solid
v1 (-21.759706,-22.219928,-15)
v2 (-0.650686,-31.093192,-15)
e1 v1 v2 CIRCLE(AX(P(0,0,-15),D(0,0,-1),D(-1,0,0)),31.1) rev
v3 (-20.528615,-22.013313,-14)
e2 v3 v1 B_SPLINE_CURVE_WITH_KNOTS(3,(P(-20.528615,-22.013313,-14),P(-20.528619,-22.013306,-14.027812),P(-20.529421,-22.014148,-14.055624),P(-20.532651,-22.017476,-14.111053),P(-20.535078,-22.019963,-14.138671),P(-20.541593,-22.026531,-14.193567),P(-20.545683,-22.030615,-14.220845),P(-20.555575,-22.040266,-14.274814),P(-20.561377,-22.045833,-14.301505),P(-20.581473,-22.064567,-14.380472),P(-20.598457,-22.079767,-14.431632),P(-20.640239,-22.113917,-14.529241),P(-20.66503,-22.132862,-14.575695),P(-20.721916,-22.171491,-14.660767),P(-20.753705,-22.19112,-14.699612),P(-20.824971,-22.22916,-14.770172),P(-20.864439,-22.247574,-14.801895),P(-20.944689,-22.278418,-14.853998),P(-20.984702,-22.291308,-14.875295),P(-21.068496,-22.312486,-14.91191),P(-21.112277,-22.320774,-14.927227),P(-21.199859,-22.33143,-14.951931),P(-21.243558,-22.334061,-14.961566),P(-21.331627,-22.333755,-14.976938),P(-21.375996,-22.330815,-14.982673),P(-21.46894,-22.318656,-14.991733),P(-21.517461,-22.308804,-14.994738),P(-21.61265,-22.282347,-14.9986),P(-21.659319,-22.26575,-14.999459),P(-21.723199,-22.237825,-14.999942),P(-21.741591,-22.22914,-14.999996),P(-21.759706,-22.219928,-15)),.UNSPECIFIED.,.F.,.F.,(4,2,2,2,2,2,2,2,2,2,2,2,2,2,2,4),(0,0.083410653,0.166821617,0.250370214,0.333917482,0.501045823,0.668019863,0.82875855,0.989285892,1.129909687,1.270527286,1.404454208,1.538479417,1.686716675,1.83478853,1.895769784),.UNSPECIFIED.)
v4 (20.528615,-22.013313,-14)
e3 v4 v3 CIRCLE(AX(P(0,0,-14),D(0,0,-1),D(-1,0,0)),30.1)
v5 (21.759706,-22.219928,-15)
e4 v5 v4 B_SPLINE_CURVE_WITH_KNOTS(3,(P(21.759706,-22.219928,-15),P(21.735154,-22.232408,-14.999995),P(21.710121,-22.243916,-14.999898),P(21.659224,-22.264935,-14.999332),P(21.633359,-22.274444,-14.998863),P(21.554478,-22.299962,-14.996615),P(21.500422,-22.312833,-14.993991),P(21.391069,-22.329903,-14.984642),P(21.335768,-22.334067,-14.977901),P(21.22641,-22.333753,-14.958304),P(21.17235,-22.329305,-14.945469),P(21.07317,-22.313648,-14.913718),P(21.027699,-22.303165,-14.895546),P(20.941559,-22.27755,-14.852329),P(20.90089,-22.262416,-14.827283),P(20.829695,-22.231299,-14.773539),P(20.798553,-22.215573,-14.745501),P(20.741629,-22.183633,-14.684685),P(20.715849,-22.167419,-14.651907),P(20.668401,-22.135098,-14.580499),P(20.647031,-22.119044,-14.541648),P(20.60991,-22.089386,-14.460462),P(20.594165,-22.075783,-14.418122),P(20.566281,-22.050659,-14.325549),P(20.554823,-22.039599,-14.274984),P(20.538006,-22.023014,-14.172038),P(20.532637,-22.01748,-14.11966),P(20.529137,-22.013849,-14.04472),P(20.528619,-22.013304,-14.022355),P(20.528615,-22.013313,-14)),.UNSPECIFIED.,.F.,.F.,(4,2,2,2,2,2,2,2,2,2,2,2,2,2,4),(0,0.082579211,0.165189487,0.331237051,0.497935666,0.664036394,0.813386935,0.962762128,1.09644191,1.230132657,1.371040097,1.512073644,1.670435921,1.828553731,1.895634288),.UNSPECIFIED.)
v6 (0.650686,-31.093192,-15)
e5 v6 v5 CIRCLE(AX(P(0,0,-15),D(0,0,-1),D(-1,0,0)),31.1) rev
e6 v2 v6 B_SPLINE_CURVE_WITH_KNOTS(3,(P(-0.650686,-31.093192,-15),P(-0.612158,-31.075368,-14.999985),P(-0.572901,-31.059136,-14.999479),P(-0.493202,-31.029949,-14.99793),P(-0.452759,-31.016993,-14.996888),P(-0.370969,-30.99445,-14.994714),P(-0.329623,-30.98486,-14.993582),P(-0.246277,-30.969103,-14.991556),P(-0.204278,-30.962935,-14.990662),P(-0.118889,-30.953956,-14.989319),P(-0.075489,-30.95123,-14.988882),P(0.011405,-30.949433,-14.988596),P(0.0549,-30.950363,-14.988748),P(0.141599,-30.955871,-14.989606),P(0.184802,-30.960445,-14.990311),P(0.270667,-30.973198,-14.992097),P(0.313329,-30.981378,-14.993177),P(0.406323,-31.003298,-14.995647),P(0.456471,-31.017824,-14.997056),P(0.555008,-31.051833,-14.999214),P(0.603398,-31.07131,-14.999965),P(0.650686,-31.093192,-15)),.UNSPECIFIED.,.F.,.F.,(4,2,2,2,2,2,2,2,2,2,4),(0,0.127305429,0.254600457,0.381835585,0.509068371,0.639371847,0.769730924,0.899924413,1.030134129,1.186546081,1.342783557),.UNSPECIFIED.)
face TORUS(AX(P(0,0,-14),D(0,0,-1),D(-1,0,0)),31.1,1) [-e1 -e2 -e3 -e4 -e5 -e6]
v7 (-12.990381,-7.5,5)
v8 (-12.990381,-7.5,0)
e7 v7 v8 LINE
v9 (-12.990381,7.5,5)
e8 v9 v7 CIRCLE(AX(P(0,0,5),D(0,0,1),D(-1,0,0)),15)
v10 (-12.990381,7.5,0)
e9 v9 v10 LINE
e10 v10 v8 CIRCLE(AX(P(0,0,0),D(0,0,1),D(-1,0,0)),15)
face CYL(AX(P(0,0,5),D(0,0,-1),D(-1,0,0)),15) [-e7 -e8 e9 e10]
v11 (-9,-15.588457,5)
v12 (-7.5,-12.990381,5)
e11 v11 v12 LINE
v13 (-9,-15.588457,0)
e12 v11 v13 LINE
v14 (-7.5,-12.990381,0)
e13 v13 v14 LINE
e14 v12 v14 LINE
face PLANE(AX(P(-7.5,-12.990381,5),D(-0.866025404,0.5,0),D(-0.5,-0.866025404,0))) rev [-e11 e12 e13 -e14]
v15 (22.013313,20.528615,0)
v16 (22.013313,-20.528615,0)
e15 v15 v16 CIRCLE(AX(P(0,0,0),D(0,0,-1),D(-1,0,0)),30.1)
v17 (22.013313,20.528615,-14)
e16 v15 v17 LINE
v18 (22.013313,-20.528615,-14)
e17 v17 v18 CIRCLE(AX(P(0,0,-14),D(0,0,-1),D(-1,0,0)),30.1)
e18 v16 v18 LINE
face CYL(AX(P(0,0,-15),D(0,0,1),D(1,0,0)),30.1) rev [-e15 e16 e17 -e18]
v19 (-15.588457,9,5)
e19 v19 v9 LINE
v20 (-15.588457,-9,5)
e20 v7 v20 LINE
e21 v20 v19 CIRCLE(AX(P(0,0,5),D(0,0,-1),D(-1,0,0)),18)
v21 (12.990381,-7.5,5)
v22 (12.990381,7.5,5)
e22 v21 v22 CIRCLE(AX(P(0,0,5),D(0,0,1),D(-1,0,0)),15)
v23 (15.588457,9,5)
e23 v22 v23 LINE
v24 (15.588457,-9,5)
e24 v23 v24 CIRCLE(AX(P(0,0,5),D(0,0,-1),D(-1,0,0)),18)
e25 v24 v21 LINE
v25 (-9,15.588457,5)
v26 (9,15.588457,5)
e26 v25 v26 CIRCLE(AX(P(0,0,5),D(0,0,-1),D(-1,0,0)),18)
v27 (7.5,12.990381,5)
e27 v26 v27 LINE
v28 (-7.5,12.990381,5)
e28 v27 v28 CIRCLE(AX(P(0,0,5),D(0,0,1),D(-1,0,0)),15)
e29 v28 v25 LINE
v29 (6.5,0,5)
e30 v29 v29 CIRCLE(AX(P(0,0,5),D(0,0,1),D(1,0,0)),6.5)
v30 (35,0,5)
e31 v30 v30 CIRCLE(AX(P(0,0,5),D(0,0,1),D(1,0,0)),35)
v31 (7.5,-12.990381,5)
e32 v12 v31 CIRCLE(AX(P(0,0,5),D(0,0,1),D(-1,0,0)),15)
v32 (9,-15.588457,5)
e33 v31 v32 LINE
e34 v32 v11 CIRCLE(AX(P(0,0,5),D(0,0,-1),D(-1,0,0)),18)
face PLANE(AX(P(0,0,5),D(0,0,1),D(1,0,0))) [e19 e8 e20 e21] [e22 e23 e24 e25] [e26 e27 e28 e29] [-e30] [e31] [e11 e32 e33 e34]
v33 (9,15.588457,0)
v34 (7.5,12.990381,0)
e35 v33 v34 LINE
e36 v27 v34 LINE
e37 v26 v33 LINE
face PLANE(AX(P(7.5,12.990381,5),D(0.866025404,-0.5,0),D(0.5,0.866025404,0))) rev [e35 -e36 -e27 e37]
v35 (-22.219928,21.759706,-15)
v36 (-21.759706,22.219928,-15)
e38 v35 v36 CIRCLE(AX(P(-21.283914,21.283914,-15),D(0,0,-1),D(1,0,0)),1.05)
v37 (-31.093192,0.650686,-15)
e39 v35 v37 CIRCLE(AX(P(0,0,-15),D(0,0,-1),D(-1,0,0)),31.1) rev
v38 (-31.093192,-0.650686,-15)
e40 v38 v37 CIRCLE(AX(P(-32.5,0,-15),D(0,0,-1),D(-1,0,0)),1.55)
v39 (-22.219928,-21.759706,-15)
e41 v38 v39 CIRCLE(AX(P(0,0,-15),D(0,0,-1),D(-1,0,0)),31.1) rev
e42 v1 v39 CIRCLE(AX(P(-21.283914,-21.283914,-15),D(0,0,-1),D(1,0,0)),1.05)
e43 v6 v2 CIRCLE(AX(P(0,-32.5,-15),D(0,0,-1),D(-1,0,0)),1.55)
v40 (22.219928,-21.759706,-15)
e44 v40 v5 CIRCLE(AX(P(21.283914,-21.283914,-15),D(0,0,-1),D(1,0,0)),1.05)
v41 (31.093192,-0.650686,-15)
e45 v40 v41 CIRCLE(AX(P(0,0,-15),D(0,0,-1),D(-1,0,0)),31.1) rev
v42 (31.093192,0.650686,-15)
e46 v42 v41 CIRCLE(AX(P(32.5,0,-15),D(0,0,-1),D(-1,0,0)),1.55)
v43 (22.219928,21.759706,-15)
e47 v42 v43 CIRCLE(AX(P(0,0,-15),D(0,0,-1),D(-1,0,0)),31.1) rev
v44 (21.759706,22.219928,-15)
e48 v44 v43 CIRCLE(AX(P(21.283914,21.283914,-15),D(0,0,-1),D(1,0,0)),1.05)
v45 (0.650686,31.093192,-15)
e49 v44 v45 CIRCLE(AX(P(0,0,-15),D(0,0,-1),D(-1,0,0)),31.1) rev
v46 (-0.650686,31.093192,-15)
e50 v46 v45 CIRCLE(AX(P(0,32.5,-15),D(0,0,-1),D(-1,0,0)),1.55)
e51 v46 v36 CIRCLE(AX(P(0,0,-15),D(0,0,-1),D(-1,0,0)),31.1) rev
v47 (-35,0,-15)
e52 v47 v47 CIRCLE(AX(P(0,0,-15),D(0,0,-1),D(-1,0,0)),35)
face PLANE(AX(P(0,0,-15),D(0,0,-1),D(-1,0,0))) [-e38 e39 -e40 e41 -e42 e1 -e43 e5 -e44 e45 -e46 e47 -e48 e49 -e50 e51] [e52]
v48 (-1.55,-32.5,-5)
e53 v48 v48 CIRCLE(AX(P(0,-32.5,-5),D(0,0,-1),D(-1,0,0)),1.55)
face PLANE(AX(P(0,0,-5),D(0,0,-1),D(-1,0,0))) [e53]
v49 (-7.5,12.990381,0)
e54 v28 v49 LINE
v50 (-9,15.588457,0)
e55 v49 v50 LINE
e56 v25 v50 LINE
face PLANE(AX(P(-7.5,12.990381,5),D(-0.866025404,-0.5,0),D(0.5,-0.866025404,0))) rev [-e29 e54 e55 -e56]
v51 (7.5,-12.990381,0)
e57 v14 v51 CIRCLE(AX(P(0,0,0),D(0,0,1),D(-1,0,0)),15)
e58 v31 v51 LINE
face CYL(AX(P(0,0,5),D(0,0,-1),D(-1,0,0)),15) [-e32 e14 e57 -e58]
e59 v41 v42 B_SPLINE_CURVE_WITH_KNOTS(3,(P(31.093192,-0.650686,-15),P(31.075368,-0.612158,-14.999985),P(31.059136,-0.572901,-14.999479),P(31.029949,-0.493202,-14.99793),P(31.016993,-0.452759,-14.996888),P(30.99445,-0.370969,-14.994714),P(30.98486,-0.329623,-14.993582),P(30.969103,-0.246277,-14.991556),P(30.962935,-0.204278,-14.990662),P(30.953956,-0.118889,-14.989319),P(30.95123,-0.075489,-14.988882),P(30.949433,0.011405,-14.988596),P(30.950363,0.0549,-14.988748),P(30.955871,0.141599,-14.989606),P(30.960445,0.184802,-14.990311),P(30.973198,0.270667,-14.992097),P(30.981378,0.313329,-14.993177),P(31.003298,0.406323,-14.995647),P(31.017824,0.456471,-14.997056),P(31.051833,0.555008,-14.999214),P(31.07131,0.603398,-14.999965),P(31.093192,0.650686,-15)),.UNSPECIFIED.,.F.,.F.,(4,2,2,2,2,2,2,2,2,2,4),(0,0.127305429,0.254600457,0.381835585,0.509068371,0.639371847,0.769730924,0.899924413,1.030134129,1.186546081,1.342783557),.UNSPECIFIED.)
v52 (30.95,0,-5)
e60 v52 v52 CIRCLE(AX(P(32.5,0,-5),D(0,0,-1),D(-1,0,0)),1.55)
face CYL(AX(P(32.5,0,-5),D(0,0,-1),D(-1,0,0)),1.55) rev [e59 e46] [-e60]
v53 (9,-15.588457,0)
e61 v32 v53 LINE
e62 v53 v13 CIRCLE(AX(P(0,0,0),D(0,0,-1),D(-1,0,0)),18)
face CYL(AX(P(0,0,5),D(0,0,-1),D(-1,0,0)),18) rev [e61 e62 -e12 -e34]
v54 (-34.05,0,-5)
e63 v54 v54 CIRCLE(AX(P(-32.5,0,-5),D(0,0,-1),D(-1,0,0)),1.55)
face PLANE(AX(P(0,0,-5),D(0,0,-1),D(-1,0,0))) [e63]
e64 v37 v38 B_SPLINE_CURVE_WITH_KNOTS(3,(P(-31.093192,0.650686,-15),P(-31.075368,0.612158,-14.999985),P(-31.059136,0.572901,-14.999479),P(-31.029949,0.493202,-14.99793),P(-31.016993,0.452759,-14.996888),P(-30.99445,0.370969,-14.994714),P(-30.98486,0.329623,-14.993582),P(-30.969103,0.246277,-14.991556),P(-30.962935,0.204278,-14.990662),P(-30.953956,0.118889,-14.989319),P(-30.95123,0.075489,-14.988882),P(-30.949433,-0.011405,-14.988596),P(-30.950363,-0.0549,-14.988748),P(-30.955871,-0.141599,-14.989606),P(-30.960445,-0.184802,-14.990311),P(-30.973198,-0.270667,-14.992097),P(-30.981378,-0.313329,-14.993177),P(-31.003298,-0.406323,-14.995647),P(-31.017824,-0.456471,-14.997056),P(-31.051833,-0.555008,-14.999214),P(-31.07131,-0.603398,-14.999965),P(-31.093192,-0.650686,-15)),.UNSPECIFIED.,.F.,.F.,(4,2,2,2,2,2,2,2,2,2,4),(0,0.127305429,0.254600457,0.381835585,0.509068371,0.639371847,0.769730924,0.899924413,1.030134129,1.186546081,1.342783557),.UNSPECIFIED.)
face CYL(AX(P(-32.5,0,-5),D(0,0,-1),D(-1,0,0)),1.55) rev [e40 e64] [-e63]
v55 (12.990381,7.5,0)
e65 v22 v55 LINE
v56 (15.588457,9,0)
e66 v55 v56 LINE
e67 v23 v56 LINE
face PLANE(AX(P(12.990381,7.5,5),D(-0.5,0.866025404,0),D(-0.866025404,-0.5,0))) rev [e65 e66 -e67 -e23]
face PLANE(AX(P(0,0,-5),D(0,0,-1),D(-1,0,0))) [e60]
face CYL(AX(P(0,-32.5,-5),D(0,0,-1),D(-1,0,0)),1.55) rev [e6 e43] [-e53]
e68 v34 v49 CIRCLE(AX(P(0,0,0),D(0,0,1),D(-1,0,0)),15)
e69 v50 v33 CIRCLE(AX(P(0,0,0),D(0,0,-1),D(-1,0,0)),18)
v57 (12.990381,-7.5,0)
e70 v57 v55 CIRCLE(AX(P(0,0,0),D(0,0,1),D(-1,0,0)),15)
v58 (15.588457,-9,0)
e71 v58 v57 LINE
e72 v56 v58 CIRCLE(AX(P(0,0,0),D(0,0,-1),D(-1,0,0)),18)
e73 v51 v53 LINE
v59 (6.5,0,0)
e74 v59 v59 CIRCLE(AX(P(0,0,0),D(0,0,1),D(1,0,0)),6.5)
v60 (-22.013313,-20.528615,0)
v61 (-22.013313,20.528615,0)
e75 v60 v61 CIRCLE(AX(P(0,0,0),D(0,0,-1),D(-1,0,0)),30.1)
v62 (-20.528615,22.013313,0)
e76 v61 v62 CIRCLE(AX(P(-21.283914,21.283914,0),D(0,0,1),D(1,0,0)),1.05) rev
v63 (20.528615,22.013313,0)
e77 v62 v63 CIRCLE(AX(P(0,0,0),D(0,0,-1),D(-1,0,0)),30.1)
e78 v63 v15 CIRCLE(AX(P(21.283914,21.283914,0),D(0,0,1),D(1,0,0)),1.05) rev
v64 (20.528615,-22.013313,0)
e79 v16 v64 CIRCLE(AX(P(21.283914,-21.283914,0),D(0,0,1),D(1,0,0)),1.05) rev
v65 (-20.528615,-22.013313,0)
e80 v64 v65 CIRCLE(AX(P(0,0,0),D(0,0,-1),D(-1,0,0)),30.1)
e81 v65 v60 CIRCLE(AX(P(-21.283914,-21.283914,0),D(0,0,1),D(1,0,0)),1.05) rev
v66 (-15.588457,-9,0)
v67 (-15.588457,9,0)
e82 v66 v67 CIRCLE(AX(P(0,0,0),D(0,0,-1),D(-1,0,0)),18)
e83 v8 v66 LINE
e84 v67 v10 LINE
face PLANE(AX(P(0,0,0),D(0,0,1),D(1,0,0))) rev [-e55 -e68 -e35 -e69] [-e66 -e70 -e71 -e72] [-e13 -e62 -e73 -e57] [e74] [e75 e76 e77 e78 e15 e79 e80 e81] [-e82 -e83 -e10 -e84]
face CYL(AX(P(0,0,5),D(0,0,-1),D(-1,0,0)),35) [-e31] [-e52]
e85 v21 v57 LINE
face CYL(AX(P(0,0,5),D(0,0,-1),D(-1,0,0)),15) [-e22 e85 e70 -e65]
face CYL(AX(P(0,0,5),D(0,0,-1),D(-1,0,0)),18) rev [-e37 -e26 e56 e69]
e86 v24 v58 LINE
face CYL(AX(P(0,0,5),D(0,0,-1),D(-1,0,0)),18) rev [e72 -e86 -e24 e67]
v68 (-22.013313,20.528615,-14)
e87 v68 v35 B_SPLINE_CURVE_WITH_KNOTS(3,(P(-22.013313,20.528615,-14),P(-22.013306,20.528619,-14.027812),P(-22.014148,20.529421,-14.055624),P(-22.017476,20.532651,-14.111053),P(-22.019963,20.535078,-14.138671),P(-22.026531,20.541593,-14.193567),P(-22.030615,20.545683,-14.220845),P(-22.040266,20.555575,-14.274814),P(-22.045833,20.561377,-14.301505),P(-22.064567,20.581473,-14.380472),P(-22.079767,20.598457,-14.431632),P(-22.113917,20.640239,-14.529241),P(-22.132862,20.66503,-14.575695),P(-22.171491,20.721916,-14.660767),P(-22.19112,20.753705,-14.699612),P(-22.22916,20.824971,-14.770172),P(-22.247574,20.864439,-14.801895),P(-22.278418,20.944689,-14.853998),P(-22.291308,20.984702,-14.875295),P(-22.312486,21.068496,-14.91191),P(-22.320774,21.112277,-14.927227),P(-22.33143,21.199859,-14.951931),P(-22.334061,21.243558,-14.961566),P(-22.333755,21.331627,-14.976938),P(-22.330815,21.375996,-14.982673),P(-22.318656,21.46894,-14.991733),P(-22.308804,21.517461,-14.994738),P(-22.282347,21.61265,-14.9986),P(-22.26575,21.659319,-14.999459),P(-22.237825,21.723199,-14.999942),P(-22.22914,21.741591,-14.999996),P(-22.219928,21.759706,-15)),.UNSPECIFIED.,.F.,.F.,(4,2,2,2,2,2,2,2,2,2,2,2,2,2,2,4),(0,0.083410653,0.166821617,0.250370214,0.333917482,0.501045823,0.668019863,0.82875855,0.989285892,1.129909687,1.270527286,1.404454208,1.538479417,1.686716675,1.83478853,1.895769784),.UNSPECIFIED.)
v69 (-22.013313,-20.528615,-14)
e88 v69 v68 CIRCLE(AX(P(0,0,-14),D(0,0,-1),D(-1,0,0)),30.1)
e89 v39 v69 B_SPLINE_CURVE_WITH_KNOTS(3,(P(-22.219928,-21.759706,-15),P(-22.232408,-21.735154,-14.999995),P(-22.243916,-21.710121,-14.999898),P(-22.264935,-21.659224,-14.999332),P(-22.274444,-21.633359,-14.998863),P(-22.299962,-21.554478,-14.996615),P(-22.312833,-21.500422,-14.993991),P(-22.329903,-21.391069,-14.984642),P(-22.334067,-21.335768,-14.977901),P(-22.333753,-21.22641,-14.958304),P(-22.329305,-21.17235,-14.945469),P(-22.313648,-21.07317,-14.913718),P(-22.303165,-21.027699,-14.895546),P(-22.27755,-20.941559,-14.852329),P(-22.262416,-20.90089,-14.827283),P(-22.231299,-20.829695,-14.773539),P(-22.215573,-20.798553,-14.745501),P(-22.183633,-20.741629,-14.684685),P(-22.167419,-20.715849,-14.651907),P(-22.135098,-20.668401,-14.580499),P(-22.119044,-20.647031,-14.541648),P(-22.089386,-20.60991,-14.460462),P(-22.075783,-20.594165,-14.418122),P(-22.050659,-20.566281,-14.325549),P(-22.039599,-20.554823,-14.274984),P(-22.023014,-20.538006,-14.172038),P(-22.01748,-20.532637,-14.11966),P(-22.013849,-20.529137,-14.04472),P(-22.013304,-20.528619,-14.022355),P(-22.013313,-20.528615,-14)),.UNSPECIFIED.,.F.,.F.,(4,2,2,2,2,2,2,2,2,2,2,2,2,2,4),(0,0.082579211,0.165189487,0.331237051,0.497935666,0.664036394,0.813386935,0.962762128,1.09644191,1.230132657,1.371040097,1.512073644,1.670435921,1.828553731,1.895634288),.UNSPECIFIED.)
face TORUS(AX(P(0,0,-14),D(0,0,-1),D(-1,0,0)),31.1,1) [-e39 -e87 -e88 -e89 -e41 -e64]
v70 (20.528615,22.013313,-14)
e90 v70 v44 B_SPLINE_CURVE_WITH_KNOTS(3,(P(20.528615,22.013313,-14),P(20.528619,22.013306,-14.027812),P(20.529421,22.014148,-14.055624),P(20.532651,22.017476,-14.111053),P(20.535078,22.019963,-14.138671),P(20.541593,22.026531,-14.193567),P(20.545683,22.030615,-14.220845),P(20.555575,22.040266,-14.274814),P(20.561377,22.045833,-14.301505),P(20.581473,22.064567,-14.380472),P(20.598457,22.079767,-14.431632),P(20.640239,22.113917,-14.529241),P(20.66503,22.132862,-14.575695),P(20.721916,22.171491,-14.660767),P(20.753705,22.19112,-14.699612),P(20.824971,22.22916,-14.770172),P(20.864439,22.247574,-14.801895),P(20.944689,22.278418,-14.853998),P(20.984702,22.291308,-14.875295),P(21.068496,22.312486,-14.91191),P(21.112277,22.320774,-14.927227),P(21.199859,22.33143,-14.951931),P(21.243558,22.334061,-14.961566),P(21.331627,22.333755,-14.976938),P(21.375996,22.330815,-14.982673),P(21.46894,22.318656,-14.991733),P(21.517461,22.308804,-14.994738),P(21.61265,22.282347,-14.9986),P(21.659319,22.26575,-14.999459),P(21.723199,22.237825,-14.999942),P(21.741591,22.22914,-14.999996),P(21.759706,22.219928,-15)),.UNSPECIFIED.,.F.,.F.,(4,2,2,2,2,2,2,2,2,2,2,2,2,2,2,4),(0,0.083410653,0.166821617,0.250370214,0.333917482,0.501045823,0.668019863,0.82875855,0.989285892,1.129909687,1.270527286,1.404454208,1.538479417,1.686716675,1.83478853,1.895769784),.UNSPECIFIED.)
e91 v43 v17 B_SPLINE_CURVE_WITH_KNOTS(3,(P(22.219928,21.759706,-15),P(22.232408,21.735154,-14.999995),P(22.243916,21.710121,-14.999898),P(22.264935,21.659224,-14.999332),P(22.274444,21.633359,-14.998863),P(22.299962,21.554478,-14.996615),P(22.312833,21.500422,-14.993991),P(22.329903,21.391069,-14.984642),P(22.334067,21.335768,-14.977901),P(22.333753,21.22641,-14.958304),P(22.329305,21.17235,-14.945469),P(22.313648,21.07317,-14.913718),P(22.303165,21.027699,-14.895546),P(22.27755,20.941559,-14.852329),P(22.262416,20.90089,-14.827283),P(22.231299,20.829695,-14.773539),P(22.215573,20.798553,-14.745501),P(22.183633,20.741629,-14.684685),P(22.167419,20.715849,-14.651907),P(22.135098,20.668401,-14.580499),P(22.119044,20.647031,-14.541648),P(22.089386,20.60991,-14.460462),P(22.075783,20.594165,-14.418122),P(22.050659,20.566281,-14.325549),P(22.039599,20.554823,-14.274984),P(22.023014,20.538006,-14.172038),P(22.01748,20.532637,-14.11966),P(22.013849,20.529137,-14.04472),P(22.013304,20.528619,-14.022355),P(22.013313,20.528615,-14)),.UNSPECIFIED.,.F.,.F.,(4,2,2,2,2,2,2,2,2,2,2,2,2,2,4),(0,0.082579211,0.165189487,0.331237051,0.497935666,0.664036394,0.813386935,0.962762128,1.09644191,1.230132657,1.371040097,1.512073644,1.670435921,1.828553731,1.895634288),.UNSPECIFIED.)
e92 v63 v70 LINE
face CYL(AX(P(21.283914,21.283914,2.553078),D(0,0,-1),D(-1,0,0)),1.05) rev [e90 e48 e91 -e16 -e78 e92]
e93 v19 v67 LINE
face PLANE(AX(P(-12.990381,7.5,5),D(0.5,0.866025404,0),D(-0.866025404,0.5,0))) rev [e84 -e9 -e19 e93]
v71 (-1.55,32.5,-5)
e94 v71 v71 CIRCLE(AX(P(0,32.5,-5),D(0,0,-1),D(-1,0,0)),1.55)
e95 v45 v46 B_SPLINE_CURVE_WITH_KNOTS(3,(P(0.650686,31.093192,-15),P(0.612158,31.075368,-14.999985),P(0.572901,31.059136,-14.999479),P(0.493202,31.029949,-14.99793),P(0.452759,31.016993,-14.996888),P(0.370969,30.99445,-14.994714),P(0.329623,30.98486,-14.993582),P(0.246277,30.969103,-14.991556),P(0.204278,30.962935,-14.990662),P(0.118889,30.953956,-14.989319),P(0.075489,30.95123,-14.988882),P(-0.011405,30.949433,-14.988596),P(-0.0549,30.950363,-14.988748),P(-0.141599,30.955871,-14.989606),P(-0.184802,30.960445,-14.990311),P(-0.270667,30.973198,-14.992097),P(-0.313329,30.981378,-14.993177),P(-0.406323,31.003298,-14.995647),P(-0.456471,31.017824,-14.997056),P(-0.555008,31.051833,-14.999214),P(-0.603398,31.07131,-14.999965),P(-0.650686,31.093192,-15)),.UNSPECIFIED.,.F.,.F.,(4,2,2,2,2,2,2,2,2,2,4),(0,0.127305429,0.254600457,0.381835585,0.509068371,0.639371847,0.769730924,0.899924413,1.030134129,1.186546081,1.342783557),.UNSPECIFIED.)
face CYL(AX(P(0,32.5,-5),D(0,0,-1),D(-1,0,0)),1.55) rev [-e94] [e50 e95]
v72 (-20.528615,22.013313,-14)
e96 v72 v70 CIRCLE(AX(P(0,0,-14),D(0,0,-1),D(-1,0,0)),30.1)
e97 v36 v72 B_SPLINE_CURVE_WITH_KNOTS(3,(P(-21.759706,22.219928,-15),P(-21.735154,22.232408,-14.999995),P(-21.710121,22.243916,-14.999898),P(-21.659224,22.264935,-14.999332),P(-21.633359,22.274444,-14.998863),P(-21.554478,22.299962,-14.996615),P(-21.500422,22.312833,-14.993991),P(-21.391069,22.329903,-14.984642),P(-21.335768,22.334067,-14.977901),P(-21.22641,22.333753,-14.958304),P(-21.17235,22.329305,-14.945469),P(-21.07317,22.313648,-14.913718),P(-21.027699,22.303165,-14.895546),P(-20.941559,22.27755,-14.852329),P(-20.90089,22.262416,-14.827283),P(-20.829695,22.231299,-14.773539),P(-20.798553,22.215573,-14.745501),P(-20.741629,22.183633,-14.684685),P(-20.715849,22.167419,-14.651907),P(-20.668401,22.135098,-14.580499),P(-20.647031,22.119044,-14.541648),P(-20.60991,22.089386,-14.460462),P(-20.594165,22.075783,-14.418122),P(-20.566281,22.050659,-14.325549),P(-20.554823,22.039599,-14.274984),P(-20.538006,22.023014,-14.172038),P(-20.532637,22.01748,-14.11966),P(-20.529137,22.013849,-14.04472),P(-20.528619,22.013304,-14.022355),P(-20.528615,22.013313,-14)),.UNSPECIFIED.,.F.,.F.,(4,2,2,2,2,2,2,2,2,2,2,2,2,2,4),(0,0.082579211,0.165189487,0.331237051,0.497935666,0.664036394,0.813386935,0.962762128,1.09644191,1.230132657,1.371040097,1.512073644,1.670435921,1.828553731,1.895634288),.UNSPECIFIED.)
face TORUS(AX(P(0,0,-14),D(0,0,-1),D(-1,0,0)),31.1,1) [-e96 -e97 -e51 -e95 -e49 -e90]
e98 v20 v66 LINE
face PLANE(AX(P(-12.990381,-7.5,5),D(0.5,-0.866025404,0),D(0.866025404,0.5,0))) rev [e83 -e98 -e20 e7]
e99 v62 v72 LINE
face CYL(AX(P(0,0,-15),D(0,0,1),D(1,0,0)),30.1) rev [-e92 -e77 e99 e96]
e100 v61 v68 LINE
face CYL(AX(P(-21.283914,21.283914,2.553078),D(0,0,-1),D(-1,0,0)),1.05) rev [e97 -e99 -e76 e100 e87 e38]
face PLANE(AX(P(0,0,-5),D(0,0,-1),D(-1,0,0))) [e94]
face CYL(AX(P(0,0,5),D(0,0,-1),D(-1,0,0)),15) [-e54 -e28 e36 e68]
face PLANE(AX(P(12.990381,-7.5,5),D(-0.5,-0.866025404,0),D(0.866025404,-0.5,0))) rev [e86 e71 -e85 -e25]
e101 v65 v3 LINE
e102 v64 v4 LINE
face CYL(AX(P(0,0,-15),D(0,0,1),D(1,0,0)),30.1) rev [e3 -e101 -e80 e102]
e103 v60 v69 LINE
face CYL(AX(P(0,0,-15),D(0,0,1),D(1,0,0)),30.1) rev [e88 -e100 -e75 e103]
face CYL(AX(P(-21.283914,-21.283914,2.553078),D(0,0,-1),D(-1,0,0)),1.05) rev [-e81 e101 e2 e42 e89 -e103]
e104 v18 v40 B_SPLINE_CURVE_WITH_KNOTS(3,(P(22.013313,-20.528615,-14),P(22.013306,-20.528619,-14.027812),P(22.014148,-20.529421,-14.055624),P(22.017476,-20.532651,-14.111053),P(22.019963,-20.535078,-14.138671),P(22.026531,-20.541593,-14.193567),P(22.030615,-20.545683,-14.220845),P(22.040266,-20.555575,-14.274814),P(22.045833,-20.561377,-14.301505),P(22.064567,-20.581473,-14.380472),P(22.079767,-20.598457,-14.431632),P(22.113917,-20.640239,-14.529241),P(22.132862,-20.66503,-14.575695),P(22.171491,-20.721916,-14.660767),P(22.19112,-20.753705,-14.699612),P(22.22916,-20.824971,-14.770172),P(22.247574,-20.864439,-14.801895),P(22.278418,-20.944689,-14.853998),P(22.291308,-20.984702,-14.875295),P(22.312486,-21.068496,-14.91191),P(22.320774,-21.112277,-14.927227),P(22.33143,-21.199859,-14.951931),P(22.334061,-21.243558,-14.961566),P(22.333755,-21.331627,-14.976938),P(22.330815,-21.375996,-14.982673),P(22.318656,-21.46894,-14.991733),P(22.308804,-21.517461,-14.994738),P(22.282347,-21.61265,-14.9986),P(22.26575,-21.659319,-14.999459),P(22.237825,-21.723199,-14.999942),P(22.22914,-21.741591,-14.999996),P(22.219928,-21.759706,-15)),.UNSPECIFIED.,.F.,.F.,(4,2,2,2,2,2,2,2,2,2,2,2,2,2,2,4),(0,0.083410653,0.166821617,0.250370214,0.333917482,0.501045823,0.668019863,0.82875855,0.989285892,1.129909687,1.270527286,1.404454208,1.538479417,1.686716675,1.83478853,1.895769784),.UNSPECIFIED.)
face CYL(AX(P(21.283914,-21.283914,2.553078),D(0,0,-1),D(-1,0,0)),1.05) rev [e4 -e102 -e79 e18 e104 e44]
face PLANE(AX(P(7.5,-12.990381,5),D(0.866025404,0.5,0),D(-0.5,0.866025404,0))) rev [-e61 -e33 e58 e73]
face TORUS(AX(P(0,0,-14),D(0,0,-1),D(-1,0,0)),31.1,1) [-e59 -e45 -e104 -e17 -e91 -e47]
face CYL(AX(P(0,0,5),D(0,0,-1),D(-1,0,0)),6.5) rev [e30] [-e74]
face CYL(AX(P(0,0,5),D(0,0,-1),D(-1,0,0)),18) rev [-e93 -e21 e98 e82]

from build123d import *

# Parameters (mm, degrees)
SKETCH_2_R          = 35
SKETCH_2_R_2        = 6.5
EXTRUDE_1_DEPTH     = 5
EXTRUDE_START       = 15
SKETCH_3_R          = 35
SKETCH_3_R_2        = 30.1
EXTRUDE_2_DEPTH     = 15
SKETCH_4_R          = 1.55
CUT_EXTRUDE_1_DEPTH = 10
CUT_EXTRUDE_2_DEPTH = 52.720402164
CUT_EXTRUDE_5_DEPTH = 15
FILLET_1_R          = 1


with BuildPart() as part:
    # 草图2 → 凸台-拉伸1 (new body)
    with BuildSketch(Plane.XY):
        Circle(SKETCH_2_R)
        Circle(SKETCH_2_R_2, mode=Mode.SUBTRACT)
    extrude(amount=EXTRUDE_1_DEPTH)

    # 草图3 → 凸台-拉伸2 (add)
    with BuildSketch(Plane(origin=(0, 0, 0), x_dir=(-1, 0, 0), z_dir=(0, 0, -1)).offset(EXTRUDE_START)):
        Circle(SKETCH_3_R)
        Circle(SKETCH_3_R_2, mode=Mode.SUBTRACT)
    extrude(amount=-EXTRUDE_2_DEPTH)

    # 草图4 → 切除-拉伸1 (cut)
    with BuildSketch(Plane(origin=(0, 0, -15), x_dir=(-1, 0, 0), z_dir=(0, 0, -1))):
        with Locations((0, 32.5)):
            Circle(SKETCH_4_R)
        with Locations((32.5, 0)):
            Circle(SKETCH_4_R)
        with Locations((0, -32.5)):
            Circle(SKETCH_4_R)
        with Locations((-32.5, 0)):
            Circle(SKETCH_4_R)
    extrude(amount=-CUT_EXTRUDE_1_DEPTH, mode=Mode.SUBTRACT)

    # 草图5 → 切除-拉伸2 (cut, through all)
    with BuildSketch(Plane(origin=(0, 0, 0), x_dir=(-1, 0, 0), z_dir=(0, 0, -1))):
        with BuildLine():
            Line((12.990381057, -7.5), (15.588457268, -9))
            ThreePointArc((15.588457268, -9), (18, 0), (15.588457268, 9))
            Line((15.588457268, 9), (12.990381057, 7.5))
            ThreePointArc((12.990381057, 7.5), (15, 0), (12.990381057, -7.5))
        make_face()
        with BuildLine():
            Line((-7.5, 12.990381057), (-9, 15.588457268))
            ThreePointArc((-9, 15.588457268), (0, 18), (9, 15.588457268))
            Line((9, 15.588457268), (7.5, 12.990381057))
            ThreePointArc((7.5, 12.990381057), (0, 15), (-7.5, 12.990381057))
        make_face()
        with BuildLine():
            Line((-7.5, -12.990381057), (-9, -15.588457268))
            ThreePointArc((-9, -15.588457268), (0, -18), (9, -15.588457268))
            Line((9, -15.588457268), (7.5, -12.990381057))
            ThreePointArc((7.5, -12.990381057), (0, -15), (-7.5, -12.990381057))
        make_face()
        with BuildLine():
            Line((-12.990381057, 7.5), (-15.588457268, 9))
            ThreePointArc((-15.588457268, 9), (-18, 0), (-15.588457268, -9))
            Line((-15.588457268, -9), (-12.990381057, -7.5))
            ThreePointArc((-12.990381057, -7.5), (-15, 0), (-12.990381057, 7.5))
        make_face()
    extrude(amount=-CUT_EXTRUDE_2_DEPTH, mode=Mode.SUBTRACT)

    # 草图9 → 切除-拉伸5 (cut)
    with BuildSketch(Plane(origin=(0, 0, -15), x_dir=(-1, 0, 0), z_dir=(0, 0, -1))):
        with BuildLine():
            ThreePointArc((-22.013313369, 20.528615017), (-22.026376234, 22.026376234), (-20.528615017, 22.013313369))
            ThreePointArc((-20.528615017, 22.013313369), (-21.283914114, 21.283914114), (-22.013313369, 20.528615017))
        make_face()
        with BuildLine():
            ThreePointArc((20.528615017, 22.013313369), (22.026376234, 22.026376234), (22.013313369, 20.528615017))
            ThreePointArc((22.013313369, 20.528615017), (21.283914114, 21.283914114), (20.528615017, 22.013313369))
        make_face()
        with BuildLine():
            ThreePointArc((22.013313369, -20.528615017), (22.026376234, -22.026376234), (20.528615017, -22.013313369))
            ThreePointArc((20.528615017, -22.013313369), (21.283914114, -21.283914114), (22.013313369, -20.528615017))
        make_face()
        with BuildLine():
            ThreePointArc((-20.528615017, -22.013313369), (-22.026376234, -22.026376234), (-22.013313369, -20.528615017))
            ThreePointArc((-22.013313369, -20.528615017), (-21.283914114, -21.283914114), (-20.528615017, -22.013313369))
        make_face()
    extrude(amount=-CUT_EXTRUDE_5_DEPTH, mode=Mode.SUBTRACT)

    # 圆角1
    # the kernel refuses this fillet: 1 mm, written as the material it takes off along each edge
    with BuildSketch(Plane(origin=(0, 0, -15), x_dir=(-0.7403558797037455, 0.6722151228498904, 0), z_dir=(-0.6722151228498904, -0.7403558797037455, 0))) as fillet_1_piece_1:
        with BuildLine():
            CenterArc((30.1 + FILLET_1_R, -FILLET_1_R), FILLET_1_R, 90, 90)
            Line((30.1, -FILLET_1_R), (30.1, 0))
            Line((30.1, 0), (30.1 + FILLET_1_R, 0))
        make_face()
    revolve(axis=Axis((0, 0, -15), (0, 0, -1)), revolution_arc=95.523479776, mode=Mode.SUBTRACT)
    with BuildSketch(Plane(origin=(0, 0, -15), x_dir=(0.6722151228498918, 0.7403558797037441, 0), z_dir=(-0.7403558797037441, 0.6722151228498918, 0))) as fillet_1_piece_2:
        with BuildLine():
            CenterArc((30.1 + FILLET_1_R, -FILLET_1_R), FILLET_1_R, 90, 90)
            Line((30.1, -FILLET_1_R), (30.1, 0))
            Line((30.1, 0), (30.1 + FILLET_1_R, 0))
        make_face()
    revolve(axis=Axis((0, 0, -15), (0, 0, -1)), revolution_arc=95.523479776, mode=Mode.SUBTRACT)
    with BuildSketch(Plane(origin=(0, 0, -15), x_dir=(0.7403558797037453, -0.6722151228498905, 0), z_dir=(0.6722151228498905, 0.7403558797037453, 0))) as fillet_1_piece_3:
        with BuildLine():
            CenterArc((30.1 + FILLET_1_R, -FILLET_1_R), FILLET_1_R, 90, 90)
            Line((30.1, -FILLET_1_R), (30.1, 0))
            Line((30.1, 0), (30.1 + FILLET_1_R, 0))
        make_face()
    revolve(axis=Axis((0, 0, -15), (0, 0, -1)), revolution_arc=95.523479776, mode=Mode.SUBTRACT)
    with BuildSketch(Plane(origin=(0, 0, -15), x_dir=(-1, 0, 0), z_dir=(0, -1, 0))) as fillet_1_piece_4:
        with BuildLine():
            CenterArc((30.1 + FILLET_1_R, -FILLET_1_R), FILLET_1_R, 90, 90)
            Line((30.1, -FILLET_1_R), (30.1, 0))
            Line((30.1, 0), (30.1 + FILLET_1_R, 0))
        make_face()
    revolve(axis=Axis((0, 0, -15), (0, 0, -1)), revolution_arc=47.760430641, mode=Mode.SUBTRACT)
    with BuildSketch(Plane(origin=(0, 0, -15), x_dir=(-0.6722320403041436, -0.7403405189428228, 0), z_dir=(0.7403405189428228, -0.6722320403041436, 0))) as fillet_1_piece_5:
        with BuildLine():
            CenterArc((30.1 + FILLET_1_R, -FILLET_1_R), FILLET_1_R, 90, 90)
            Line((30.1, -FILLET_1_R), (30.1, 0))
            Line((30.1, 0), (30.1 + FILLET_1_R, 0))
        make_face()
    revolve(axis=Axis((0, 0, -15), (0, 0, -1)), revolution_arc=47.760430641, mode=Mode.SUBTRACT)


solid = part.part
